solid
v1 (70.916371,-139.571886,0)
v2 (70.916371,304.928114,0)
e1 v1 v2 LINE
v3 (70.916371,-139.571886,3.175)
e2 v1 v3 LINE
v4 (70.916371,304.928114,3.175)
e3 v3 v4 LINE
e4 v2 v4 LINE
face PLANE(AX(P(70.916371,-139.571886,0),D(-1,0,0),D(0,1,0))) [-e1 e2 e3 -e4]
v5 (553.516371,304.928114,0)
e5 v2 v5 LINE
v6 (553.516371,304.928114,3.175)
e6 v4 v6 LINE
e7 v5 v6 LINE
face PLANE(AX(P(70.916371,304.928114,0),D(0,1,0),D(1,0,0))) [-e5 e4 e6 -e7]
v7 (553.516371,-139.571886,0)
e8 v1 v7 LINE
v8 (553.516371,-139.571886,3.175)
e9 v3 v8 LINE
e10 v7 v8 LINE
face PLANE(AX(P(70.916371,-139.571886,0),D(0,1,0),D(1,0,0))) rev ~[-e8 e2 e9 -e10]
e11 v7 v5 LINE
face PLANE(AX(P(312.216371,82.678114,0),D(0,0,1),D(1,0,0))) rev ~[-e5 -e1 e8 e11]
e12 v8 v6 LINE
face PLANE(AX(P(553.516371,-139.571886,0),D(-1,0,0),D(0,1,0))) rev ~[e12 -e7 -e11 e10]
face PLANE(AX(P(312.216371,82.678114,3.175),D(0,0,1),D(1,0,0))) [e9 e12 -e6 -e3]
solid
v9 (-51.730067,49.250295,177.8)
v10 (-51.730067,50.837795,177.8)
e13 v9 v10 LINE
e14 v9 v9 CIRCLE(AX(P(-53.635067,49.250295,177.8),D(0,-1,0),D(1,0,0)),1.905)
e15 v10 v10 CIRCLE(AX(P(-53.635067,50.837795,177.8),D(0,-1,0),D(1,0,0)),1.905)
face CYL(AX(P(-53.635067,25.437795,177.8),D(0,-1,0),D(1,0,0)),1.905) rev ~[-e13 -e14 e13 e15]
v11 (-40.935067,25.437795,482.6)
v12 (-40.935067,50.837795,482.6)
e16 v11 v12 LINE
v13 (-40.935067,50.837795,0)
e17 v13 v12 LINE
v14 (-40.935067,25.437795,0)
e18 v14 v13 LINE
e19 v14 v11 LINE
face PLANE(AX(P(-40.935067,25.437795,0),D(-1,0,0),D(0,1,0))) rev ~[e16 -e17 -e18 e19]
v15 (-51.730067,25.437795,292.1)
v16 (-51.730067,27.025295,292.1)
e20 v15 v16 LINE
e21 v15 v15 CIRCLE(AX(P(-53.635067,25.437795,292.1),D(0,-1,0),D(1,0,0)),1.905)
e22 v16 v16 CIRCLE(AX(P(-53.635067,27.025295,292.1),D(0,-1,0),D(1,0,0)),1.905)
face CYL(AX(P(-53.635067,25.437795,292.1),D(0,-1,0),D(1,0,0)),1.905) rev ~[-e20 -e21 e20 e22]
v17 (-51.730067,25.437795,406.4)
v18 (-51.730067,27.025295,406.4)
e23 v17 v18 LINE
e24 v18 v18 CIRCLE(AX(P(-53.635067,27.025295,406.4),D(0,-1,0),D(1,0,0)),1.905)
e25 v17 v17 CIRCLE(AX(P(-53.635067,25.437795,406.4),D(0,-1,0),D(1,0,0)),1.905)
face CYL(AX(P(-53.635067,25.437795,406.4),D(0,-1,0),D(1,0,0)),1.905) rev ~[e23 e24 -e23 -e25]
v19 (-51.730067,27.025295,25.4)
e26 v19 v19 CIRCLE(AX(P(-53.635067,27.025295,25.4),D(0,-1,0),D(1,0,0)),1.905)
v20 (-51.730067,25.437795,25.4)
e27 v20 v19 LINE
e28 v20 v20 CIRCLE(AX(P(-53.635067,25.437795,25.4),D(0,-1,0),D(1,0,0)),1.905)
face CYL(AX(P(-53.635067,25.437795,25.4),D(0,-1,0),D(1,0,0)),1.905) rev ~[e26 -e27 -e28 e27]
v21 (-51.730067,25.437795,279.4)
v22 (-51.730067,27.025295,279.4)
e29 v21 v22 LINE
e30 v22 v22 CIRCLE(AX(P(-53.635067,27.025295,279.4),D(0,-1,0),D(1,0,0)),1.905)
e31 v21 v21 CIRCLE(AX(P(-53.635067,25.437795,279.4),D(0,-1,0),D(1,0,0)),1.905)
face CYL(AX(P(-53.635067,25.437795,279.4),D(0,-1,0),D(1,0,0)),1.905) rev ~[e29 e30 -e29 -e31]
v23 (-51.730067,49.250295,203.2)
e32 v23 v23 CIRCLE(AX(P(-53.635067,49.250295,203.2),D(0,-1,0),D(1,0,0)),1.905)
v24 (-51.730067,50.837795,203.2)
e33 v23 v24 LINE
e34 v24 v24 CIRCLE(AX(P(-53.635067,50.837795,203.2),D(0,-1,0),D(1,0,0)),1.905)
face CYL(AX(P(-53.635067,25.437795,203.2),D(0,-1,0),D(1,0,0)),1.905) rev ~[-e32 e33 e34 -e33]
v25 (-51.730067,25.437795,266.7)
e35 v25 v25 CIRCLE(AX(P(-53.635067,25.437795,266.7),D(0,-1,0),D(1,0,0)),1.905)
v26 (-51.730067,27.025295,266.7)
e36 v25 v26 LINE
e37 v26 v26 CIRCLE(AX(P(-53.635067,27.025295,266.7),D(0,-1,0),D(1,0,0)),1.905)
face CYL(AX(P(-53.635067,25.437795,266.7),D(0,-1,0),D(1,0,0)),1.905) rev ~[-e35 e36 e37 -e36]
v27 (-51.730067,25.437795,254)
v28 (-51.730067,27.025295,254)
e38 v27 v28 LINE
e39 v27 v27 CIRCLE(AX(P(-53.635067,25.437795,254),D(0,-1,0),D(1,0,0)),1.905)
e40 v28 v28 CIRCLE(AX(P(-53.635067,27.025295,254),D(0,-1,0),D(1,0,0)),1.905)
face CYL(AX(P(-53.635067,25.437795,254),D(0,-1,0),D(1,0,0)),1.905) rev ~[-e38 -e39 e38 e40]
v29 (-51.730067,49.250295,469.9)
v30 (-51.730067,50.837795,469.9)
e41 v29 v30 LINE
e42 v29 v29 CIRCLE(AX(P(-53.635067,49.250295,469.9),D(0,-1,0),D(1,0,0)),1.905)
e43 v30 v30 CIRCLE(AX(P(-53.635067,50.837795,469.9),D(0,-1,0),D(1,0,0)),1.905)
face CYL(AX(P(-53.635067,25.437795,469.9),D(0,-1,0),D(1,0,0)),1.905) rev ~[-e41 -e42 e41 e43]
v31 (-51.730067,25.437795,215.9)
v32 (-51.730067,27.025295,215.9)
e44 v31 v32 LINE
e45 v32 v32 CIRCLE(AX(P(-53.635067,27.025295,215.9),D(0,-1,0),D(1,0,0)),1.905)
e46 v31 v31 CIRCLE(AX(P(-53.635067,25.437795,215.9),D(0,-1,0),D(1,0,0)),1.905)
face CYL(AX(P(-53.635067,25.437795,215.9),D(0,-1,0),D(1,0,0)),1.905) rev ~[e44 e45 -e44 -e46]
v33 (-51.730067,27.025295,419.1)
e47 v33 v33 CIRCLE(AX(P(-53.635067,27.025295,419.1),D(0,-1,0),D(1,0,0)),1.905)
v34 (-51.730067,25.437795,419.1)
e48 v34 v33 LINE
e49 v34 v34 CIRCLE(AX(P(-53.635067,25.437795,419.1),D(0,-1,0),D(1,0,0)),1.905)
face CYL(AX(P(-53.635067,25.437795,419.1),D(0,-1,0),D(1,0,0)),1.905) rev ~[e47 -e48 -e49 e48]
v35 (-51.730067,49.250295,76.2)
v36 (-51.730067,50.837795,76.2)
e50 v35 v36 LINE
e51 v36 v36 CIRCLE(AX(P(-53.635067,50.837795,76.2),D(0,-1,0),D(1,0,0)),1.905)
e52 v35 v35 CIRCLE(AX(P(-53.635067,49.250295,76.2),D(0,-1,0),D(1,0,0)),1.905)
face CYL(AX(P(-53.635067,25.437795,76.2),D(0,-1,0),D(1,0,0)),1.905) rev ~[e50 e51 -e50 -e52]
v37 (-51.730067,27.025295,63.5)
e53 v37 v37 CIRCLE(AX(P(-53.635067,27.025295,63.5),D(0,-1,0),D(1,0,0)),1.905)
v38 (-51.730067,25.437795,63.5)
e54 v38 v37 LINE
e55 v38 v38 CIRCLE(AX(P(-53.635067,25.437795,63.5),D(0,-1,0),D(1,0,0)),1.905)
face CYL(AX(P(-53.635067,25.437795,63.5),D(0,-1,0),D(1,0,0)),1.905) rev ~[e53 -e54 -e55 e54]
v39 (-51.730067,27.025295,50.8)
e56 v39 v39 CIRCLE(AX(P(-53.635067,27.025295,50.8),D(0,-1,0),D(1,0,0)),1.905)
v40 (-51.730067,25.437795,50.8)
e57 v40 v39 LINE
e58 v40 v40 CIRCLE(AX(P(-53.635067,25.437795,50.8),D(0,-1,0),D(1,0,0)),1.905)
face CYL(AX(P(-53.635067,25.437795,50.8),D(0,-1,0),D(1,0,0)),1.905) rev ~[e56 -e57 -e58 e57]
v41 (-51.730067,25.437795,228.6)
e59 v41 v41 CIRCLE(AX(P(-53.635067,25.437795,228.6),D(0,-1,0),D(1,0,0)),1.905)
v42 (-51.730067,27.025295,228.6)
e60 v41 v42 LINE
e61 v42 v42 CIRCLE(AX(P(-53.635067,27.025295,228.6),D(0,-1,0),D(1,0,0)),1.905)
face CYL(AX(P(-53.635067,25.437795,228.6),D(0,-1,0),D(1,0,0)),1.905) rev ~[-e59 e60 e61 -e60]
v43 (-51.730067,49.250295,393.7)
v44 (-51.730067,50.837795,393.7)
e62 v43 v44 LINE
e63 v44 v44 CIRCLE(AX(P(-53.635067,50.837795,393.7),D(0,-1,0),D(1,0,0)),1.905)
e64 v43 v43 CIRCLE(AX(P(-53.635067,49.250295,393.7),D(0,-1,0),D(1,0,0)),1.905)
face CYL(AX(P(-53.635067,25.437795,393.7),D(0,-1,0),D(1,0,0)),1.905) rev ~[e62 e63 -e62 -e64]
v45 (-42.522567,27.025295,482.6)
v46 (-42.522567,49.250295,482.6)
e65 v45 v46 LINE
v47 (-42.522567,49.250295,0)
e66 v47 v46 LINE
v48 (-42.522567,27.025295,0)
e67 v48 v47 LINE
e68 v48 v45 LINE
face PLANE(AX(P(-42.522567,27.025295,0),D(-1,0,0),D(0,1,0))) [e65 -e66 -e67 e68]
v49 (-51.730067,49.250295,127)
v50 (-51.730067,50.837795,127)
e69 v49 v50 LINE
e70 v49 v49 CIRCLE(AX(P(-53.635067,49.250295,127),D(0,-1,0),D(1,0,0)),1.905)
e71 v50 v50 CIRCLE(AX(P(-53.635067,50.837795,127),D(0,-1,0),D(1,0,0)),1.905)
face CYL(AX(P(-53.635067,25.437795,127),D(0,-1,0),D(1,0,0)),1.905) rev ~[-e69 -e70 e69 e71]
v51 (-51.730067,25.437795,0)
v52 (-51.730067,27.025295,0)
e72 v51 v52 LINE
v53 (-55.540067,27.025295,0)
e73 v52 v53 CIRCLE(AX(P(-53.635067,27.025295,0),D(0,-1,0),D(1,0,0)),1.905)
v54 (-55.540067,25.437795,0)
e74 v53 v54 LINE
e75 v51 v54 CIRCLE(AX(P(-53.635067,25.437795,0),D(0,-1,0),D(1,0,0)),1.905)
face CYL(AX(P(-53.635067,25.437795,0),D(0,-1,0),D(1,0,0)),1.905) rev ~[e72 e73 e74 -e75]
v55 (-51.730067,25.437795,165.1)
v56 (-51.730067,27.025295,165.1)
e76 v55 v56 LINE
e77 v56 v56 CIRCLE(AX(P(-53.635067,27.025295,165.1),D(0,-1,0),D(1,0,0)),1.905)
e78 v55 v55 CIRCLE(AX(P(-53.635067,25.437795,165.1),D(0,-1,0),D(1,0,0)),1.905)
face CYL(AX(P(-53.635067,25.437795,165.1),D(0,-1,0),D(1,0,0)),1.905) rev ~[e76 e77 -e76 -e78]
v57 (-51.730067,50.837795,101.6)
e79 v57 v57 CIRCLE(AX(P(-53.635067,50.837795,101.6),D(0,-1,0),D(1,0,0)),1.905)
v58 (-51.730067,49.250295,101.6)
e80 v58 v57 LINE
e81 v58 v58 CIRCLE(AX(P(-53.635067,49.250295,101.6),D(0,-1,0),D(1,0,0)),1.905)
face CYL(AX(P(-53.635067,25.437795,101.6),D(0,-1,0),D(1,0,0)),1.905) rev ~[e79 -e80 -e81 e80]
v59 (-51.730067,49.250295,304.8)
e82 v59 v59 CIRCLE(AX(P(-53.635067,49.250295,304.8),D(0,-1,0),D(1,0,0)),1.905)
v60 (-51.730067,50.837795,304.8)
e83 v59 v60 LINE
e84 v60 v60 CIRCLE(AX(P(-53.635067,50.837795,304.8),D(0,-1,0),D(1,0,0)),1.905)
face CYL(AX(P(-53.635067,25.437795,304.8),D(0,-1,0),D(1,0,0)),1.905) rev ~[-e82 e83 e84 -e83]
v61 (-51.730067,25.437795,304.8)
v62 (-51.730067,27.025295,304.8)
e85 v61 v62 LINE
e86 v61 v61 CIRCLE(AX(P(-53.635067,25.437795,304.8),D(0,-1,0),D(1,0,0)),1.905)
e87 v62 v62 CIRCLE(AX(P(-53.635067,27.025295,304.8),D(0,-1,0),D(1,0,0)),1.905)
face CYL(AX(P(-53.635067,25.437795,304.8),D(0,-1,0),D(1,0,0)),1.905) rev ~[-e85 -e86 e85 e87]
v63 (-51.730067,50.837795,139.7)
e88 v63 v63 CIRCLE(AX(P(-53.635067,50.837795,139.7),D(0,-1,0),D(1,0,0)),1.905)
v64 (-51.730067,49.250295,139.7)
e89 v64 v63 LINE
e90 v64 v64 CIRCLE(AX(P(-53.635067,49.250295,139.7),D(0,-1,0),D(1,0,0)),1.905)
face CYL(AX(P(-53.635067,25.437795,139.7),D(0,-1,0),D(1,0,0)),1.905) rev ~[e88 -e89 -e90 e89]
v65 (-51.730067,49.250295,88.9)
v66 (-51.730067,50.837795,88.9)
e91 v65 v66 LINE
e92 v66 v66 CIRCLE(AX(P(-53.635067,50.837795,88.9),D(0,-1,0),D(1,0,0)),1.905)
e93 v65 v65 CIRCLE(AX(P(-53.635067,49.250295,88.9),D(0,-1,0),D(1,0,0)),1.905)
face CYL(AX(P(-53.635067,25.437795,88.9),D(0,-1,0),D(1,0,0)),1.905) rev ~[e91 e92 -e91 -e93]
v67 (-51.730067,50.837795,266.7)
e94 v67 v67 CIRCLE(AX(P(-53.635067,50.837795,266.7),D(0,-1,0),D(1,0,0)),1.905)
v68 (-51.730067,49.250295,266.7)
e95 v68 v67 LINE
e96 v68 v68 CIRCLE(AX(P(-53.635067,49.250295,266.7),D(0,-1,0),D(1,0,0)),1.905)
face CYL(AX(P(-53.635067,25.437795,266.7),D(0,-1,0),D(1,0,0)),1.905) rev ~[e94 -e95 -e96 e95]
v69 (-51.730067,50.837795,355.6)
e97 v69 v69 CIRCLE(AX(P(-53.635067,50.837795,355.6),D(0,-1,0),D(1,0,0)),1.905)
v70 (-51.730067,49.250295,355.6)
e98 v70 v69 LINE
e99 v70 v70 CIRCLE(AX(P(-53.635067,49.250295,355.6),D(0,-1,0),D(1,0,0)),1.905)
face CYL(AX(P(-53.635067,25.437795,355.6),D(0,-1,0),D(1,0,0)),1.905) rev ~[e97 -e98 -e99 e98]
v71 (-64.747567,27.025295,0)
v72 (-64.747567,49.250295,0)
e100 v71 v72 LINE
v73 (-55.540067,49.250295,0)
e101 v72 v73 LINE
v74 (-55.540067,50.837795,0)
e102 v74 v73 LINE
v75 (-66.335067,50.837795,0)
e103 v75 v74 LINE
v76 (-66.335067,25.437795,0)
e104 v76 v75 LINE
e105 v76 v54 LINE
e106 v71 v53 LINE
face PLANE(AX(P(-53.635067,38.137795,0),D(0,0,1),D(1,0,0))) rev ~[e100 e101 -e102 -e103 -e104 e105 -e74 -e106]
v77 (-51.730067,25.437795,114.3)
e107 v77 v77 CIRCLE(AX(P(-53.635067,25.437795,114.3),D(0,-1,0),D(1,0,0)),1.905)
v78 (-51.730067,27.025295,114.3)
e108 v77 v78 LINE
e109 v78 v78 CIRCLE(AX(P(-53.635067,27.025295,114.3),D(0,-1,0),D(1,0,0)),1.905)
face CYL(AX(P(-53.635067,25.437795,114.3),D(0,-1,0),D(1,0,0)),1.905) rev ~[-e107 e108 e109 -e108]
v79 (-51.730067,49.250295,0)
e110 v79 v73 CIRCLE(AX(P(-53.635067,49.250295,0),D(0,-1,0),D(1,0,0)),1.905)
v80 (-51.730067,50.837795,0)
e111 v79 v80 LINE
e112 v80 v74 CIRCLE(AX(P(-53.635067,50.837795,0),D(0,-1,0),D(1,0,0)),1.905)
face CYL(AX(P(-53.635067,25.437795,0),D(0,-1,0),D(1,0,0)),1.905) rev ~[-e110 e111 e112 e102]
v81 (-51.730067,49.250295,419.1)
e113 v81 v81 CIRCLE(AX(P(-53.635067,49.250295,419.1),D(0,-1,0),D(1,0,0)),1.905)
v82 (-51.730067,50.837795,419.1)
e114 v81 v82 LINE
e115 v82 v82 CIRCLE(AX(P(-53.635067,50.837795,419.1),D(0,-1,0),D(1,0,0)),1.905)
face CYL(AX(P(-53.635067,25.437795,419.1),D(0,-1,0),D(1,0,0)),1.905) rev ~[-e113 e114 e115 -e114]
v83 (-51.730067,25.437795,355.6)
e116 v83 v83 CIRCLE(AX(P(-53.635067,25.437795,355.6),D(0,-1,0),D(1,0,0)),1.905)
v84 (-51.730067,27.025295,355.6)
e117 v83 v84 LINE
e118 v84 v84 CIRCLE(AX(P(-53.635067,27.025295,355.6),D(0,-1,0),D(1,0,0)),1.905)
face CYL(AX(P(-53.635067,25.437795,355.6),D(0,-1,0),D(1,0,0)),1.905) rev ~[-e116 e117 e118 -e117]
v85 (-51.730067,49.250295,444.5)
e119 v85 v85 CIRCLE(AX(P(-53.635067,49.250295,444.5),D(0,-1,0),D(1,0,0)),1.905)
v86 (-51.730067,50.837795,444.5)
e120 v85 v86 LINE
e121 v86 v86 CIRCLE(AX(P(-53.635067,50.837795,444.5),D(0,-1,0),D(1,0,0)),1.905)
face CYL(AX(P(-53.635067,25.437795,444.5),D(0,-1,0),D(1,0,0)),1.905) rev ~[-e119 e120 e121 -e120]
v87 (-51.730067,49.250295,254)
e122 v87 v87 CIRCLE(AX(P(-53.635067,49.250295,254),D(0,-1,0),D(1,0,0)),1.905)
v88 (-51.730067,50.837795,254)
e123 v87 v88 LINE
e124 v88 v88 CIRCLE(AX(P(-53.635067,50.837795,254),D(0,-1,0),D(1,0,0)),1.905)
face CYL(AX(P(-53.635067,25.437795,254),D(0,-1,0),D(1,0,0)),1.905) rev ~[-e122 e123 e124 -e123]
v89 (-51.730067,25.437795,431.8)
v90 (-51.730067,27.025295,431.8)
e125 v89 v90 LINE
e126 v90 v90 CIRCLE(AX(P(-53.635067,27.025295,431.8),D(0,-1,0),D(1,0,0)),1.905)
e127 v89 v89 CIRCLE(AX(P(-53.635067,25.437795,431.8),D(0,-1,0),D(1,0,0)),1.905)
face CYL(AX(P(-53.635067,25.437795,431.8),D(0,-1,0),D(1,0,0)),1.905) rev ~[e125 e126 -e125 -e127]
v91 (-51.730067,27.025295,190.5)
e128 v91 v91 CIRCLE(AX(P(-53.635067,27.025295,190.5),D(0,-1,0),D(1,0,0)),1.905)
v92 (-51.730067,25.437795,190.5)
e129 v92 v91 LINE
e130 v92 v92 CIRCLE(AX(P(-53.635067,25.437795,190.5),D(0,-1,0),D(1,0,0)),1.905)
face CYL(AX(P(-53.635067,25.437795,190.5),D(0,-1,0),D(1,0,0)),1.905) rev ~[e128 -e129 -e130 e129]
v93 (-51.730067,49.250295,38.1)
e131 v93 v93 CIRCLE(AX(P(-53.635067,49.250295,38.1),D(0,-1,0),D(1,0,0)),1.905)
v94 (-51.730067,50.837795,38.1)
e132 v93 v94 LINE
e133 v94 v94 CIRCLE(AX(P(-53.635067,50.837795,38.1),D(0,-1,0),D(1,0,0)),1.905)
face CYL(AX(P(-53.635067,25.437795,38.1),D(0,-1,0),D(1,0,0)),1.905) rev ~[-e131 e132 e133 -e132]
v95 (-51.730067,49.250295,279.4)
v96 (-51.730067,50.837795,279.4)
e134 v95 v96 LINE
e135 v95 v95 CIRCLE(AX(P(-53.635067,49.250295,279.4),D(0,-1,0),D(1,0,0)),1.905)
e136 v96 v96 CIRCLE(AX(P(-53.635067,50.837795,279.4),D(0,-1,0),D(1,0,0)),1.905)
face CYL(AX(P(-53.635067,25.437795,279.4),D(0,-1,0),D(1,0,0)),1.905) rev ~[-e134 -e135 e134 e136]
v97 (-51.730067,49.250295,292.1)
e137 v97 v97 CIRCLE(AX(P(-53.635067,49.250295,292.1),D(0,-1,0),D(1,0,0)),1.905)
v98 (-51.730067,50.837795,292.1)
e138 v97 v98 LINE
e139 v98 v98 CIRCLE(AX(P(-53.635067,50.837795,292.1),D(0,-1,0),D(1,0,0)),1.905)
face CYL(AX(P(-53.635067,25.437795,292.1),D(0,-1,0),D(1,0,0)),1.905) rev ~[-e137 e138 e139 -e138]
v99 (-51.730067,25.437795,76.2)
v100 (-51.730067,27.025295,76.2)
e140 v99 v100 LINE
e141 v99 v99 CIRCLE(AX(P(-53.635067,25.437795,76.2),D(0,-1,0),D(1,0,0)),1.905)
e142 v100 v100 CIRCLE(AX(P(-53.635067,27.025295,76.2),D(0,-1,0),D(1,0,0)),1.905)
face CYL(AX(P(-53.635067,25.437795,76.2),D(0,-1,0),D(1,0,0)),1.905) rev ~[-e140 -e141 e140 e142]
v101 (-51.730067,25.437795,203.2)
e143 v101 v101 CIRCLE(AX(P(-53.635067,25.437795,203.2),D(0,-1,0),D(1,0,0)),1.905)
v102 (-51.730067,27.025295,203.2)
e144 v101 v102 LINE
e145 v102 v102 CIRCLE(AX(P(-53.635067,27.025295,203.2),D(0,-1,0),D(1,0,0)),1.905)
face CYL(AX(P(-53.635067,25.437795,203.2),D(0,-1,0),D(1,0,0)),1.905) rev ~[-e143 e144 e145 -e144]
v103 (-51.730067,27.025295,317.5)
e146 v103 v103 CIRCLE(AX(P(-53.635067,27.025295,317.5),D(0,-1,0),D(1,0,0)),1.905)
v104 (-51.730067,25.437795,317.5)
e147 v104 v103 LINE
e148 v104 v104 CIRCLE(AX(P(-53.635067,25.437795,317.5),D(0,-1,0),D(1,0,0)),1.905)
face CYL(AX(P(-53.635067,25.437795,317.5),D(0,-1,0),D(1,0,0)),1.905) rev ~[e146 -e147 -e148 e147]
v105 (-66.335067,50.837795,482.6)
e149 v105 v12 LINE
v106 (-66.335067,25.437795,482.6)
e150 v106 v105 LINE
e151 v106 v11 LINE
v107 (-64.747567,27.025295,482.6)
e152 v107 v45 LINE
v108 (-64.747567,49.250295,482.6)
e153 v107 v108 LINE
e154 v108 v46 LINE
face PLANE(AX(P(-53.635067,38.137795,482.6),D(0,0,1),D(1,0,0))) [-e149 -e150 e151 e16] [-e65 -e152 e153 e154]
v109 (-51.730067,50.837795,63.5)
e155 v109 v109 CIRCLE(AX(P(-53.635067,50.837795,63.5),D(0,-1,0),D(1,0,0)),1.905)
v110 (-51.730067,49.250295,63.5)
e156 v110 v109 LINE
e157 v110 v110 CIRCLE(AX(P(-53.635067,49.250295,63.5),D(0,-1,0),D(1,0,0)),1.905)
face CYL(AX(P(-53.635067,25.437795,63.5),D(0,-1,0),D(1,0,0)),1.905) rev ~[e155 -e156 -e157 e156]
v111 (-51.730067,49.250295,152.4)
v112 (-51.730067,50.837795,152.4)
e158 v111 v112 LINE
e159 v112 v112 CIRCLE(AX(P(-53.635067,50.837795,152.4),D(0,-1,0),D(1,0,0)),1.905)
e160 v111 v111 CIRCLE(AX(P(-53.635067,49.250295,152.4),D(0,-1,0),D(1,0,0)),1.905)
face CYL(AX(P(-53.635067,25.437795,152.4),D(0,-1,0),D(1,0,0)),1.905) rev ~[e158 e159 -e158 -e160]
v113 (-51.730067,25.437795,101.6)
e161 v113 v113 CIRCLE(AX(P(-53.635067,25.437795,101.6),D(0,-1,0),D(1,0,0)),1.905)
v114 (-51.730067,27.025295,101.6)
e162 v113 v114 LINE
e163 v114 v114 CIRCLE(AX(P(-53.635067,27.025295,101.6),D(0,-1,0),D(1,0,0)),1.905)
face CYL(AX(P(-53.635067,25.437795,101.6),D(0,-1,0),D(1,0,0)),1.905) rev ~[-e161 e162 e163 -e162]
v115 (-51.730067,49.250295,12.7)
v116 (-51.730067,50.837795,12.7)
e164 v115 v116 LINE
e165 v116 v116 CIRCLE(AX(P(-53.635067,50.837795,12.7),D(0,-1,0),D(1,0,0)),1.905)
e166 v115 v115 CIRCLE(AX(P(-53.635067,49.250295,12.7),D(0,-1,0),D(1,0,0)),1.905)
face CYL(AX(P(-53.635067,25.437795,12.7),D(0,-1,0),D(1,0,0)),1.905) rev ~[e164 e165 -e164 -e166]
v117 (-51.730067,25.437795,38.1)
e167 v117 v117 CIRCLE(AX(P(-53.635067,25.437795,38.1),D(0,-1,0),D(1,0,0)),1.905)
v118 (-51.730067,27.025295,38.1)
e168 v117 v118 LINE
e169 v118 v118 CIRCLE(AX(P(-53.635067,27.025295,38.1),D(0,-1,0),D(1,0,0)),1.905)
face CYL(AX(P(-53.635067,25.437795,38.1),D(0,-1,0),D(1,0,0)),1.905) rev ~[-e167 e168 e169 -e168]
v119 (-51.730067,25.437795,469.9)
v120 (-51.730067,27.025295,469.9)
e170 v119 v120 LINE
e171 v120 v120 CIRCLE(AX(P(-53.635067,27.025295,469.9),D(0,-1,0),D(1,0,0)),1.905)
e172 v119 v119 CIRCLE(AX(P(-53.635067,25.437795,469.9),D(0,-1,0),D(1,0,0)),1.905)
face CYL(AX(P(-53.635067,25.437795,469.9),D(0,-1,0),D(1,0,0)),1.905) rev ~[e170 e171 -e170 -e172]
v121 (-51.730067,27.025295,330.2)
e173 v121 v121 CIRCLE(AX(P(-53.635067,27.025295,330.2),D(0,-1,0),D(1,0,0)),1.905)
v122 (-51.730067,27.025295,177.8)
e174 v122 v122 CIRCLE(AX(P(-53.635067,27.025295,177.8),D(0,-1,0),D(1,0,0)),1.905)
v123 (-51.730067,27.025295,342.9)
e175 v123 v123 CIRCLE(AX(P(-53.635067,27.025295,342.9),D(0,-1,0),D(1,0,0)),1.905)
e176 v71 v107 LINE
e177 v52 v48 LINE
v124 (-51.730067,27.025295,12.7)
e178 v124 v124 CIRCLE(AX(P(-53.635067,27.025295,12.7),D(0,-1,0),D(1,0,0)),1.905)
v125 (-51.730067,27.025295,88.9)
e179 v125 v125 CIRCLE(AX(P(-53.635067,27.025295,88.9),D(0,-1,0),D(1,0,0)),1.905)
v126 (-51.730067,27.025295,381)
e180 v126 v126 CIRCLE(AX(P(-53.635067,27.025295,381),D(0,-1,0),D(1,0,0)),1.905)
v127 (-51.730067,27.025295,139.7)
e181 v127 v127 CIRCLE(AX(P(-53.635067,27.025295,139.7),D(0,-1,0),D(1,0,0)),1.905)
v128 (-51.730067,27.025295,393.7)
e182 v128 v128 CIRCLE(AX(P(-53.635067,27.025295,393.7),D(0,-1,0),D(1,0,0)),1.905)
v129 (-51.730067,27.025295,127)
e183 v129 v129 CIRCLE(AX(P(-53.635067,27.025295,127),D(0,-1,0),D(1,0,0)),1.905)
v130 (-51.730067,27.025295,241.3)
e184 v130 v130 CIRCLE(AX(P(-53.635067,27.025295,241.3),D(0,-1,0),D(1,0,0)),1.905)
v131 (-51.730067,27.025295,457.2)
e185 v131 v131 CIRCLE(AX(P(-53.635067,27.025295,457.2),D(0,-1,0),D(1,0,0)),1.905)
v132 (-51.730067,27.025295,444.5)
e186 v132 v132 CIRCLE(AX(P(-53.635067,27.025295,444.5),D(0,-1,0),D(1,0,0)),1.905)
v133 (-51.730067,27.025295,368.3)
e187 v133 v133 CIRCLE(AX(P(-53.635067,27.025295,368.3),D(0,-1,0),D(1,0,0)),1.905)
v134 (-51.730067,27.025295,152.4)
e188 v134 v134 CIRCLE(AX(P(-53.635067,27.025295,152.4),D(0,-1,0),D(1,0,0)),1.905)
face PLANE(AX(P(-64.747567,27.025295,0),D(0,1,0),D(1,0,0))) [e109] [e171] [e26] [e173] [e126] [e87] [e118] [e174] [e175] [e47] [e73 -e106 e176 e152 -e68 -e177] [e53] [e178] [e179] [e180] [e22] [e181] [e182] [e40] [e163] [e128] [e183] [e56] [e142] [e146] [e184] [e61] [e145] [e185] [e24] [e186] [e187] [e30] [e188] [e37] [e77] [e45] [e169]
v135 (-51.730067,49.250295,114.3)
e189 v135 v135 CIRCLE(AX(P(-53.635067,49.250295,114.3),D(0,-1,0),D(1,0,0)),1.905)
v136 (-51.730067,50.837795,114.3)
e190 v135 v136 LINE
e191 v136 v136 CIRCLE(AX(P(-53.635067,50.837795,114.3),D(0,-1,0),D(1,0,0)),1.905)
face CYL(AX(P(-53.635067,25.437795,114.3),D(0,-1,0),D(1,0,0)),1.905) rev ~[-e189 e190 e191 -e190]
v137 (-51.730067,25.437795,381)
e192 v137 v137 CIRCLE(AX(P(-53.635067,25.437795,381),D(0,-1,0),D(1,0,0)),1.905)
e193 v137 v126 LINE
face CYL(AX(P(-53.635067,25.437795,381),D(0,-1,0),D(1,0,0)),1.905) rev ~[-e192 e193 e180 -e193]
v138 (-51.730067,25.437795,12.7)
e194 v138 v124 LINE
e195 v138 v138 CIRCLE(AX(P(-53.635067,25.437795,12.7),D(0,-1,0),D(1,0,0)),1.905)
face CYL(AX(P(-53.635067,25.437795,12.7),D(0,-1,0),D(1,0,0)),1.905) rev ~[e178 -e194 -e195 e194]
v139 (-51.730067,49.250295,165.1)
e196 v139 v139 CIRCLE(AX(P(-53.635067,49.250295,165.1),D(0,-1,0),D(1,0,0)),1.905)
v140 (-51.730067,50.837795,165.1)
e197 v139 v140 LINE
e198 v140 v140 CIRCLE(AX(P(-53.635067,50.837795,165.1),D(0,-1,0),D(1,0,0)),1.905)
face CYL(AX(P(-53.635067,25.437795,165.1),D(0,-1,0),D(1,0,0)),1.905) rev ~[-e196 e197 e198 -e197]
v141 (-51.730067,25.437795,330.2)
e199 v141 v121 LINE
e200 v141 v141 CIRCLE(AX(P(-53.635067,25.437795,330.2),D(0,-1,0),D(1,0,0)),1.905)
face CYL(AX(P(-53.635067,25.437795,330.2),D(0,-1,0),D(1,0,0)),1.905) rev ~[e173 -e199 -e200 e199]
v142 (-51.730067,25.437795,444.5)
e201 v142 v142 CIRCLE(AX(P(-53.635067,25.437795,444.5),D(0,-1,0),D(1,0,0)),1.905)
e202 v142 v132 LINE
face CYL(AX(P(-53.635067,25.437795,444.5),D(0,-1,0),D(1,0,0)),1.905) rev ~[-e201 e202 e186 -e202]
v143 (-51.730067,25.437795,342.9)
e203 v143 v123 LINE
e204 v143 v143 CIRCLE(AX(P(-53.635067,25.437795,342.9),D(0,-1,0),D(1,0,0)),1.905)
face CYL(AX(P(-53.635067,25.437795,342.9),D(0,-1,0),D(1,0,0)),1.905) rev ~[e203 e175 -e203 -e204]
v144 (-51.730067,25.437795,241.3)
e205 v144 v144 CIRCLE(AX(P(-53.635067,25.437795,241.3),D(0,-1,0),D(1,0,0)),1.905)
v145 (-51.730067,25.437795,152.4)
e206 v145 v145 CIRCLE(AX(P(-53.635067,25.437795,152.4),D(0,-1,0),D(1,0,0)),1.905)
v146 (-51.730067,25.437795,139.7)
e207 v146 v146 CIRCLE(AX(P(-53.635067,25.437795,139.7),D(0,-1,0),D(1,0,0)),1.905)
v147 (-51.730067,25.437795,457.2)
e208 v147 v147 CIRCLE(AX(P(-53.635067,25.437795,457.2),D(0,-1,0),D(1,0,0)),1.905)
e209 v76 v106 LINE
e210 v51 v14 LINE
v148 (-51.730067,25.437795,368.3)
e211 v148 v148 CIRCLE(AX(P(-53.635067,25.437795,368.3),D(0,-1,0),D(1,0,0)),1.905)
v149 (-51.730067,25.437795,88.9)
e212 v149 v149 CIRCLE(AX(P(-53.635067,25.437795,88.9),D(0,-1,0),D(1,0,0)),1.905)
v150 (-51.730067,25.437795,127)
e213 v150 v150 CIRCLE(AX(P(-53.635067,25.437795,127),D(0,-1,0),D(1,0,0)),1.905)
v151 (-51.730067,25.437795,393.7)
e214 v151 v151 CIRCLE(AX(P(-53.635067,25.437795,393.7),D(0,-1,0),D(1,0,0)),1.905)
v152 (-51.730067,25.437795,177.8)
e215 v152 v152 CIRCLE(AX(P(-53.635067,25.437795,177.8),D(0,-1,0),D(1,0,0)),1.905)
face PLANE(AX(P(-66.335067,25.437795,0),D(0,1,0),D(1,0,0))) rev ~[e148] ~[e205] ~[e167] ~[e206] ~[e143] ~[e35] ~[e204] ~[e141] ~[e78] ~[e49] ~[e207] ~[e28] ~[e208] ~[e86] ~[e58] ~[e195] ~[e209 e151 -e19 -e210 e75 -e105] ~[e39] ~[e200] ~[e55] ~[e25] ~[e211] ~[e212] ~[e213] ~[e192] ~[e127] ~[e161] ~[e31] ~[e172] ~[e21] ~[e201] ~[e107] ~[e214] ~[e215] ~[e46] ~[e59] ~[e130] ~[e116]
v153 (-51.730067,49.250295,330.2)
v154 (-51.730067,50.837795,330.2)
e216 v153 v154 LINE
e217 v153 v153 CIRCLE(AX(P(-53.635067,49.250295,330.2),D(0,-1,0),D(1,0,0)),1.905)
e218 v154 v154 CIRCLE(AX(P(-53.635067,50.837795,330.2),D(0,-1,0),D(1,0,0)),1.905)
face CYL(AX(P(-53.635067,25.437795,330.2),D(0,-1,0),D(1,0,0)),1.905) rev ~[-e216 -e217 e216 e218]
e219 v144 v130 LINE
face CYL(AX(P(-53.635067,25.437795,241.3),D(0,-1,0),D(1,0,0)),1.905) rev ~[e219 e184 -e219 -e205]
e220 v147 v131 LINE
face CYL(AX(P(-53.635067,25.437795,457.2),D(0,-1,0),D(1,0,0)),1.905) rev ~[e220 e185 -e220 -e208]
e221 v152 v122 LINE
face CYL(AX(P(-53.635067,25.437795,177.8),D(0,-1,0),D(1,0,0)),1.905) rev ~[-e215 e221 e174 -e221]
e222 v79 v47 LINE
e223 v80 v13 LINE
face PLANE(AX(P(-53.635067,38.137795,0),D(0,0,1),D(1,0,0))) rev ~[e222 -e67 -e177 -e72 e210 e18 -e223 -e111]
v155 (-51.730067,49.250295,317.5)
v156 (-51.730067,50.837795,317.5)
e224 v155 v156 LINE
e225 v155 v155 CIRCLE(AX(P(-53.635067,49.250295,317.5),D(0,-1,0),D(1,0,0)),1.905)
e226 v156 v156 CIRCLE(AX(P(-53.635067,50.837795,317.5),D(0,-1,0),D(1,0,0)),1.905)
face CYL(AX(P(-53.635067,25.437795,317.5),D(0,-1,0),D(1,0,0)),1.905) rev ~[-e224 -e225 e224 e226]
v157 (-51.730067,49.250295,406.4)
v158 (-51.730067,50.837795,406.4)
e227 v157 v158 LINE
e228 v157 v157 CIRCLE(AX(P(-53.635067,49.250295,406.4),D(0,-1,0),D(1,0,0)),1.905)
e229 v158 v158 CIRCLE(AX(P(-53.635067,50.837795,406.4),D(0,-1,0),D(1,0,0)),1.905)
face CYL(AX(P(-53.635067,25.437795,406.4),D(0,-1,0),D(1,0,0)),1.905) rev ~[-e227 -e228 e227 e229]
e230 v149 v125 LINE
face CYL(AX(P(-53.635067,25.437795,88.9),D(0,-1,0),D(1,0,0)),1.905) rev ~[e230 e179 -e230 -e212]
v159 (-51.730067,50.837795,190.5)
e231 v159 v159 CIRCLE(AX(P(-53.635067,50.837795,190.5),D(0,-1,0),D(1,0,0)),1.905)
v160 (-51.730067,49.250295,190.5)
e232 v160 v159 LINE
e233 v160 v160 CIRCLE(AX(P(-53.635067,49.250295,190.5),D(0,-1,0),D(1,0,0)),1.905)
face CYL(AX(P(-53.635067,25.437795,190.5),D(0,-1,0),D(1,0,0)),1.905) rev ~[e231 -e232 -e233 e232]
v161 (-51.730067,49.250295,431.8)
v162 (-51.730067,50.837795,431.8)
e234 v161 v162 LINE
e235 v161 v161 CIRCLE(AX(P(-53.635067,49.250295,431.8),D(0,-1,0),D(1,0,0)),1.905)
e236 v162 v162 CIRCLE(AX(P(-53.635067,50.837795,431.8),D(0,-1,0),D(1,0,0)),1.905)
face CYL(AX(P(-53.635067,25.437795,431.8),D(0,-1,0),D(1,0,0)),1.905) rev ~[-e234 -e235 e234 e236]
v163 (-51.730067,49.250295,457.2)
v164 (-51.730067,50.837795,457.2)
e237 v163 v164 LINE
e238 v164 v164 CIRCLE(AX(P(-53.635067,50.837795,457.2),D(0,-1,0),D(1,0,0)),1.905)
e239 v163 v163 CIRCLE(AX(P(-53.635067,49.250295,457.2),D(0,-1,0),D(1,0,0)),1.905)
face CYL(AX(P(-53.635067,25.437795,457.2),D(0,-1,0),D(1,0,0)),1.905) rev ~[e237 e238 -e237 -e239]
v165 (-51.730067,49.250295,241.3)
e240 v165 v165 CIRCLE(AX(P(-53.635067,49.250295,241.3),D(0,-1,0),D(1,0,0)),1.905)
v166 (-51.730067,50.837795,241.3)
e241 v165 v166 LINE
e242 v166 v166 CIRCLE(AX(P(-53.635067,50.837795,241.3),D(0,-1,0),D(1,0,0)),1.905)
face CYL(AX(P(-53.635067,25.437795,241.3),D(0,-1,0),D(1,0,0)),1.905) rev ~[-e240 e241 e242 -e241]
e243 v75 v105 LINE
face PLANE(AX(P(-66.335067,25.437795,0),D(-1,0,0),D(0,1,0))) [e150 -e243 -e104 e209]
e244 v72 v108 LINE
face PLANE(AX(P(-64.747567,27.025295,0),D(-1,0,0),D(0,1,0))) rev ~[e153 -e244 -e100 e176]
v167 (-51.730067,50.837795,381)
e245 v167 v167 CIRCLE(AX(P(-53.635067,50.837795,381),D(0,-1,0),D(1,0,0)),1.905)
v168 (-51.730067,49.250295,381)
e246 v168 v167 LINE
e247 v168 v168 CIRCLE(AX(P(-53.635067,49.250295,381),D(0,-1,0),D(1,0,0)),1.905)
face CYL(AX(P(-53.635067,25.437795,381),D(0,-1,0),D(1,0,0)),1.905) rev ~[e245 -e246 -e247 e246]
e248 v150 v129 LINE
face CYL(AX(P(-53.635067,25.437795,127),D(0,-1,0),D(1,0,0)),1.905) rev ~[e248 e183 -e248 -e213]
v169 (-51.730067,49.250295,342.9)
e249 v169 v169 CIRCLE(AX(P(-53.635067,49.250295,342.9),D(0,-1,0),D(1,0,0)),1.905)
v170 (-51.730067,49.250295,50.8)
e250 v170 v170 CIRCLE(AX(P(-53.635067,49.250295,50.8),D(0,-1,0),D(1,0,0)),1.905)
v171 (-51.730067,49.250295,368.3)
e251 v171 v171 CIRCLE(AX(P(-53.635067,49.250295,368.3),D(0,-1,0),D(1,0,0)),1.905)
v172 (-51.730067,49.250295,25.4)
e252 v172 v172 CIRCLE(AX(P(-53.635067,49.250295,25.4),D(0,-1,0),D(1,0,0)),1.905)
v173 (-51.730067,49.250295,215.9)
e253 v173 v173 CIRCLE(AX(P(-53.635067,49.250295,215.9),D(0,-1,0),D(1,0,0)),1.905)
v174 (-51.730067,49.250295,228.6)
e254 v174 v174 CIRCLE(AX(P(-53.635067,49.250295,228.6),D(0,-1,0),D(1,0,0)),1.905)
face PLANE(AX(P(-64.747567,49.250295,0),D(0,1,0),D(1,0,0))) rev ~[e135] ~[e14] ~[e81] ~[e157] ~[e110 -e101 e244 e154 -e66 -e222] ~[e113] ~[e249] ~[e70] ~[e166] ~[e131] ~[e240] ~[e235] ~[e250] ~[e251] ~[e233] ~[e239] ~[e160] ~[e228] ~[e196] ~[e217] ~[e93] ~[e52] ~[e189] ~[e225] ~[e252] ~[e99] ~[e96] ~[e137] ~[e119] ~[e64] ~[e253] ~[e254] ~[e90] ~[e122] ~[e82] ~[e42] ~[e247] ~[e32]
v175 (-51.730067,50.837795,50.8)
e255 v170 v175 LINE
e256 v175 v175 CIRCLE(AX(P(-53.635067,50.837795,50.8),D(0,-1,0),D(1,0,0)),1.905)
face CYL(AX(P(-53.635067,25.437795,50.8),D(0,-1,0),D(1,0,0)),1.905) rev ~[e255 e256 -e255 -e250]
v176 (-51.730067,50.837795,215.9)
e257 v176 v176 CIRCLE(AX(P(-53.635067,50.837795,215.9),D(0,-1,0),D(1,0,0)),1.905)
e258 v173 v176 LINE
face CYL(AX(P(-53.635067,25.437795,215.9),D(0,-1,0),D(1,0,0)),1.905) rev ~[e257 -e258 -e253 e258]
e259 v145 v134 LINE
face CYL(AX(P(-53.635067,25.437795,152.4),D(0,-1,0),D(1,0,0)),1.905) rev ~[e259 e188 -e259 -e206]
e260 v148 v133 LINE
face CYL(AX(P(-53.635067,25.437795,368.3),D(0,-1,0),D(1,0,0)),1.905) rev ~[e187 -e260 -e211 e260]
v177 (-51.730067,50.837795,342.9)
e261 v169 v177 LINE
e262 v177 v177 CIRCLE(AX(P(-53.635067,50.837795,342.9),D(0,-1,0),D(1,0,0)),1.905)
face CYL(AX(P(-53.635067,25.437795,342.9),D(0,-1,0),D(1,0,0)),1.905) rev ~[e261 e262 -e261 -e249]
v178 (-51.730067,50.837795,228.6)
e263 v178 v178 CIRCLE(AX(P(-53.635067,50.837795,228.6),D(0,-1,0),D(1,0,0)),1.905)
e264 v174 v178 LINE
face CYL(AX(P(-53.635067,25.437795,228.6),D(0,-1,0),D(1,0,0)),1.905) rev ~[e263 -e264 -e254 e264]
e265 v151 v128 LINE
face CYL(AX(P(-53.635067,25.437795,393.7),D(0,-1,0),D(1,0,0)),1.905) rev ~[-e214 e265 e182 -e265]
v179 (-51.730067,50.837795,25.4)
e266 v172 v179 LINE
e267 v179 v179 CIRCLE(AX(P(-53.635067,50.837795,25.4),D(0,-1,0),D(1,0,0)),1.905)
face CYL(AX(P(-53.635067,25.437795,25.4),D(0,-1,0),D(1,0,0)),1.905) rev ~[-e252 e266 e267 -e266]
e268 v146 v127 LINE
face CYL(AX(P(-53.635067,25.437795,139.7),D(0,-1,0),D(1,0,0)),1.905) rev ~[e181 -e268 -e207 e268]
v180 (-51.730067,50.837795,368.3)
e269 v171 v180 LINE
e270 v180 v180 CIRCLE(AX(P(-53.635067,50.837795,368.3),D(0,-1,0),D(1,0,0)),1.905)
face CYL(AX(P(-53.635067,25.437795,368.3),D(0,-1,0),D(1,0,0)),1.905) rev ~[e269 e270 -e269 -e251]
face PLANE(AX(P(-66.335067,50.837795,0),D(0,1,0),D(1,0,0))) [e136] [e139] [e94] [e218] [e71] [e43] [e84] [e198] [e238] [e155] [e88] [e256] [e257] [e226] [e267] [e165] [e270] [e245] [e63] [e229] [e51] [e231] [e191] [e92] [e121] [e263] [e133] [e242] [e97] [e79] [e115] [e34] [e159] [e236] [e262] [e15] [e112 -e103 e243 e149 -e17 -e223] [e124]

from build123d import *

# Parameters (mm, degrees)
F0_W     = 25.4
F0_H     = 25.4
F0_W_2   = 22.225
F0_H_2   = 22.225
F1_DEPTH = 482.6
F2_R     = 1.905
F3_DEPTH = 25.401
F4_W     = 482.6
F4_H     = 444.5
F5_DEPTH = 3.175


# Not quite as in the source:
# - a length typed as a fraction of an inch, garbled in the dataset ("3 / 203.2 mm" for 3/8 in), is restored


with BuildPart() as f1:
    # F0 (on Top) → F1 (new body)
    with BuildSketch(Plane.XY):
        with Locations((-53.6350669761, 38.1377951519)):
            Rectangle(F0_W, F0_H)
        with Locations((-53.6350669761, 38.1377951519)):
            Rectangle(F0_W_2, F0_H_2, mode=Mode.SUBTRACT)
    extrude(amount=F1_DEPTH)

    # F2 (on face) → F3 (cut, through all)
    with BuildSketch(Plane.XZ.offset(-25.4377951519)):
        with Locations((-53.6350669761, 469.9)):
            Circle(F2_R)
        with Locations((-53.6350669761, 457.2)):
            Circle(F2_R)
        with Locations((-53.6350669761, 444.5)):
            Circle(F2_R)
        with Locations((-53.6350669761, 431.8)):
            Circle(F2_R)
        with Locations((-53.6350669761, 419.1)):
            Circle(F2_R)
        with Locations((-53.6350669761, 406.4)):
            Circle(F2_R)
        with Locations((-53.6350669761, 393.7)):
            Circle(F2_R)
        with Locations((-53.6350669761, 381)):
            Circle(F2_R)
        with Locations((-53.6350669761, 368.3)):
            Circle(F2_R)
        with Locations((-53.6350669761, 355.6)):
            Circle(F2_R)
        with Locations((-53.6350669761, 342.9)):
            Circle(F2_R)
        with Locations((-53.6350669761, 330.2)):
            Circle(F2_R)
        with Locations((-53.6350669761, 317.5)):
            Circle(F2_R)
        with Locations((-53.6350669761, 304.8)):
            Circle(F2_R)
        with Locations((-53.6350669761, 292.1)):
            Circle(F2_R)
        with Locations((-53.6350669761, 279.4)):
            Circle(F2_R)
        with Locations((-53.6350669761, 266.7)):
            Circle(F2_R)
        with Locations((-53.6350669761, 254)):
            Circle(F2_R)
        with Locations((-53.6350669761, 241.3)):
            Circle(F2_R)
        with Locations((-53.6350669761, 228.6)):
            Circle(F2_R)
        with Locations((-53.6350669761, 215.9)):
            Circle(F2_R)
        with Locations((-53.6350669761, 203.2)):
            Circle(F2_R)
        with Locations((-53.6350669761, 190.5)):
            Circle(F2_R)
        with Locations((-53.6350669761, 177.8)):
            Circle(F2_R)
        with Locations((-53.6350669761, 165.1)):
            Circle(F2_R)
        with Locations((-53.6350669761, 152.4)):
            Circle(F2_R)
        with Locations((-53.6350669761, 139.7)):
            Circle(F2_R)
        with Locations((-53.6350669761, 127)):
            Circle(F2_R)
        with Locations((-53.6350669761, 114.3)):
            Circle(F2_R)
        with Locations((-53.6350669761, 101.6)):
            Circle(F2_R)
        with Locations((-53.6350669761, 88.9)):
            Circle(F2_R)
        with Locations((-53.6350669761, 76.2)):
            Circle(F2_R)
        with Locations((-53.6350669761, 63.5)):
            Circle(F2_R)
        with Locations((-53.6350669761, 50.8)):
            Circle(F2_R)
        with Locations((-53.6350669761, 38.1)):
            Circle(F2_R)
        with Locations((-53.6350669761, 25.4)):
            Circle(F2_R)
        with Locations((-53.6350669761, 12.7)):
            Circle(F2_R)
        with Locations((-53.6350669761, 0)):
            Circle(F2_R)
        with Locations((-53.6350669761, -12.7)):
            Circle(F2_R)
        with Locations((-53.6350669761, -25.4)):
            Circle(F2_R)
    extrude(amount=-F3_DEPTH, mode=Mode.SUBTRACT)


with BuildPart() as f5:
    # F4 (on Top) → F5 (new body)
    with BuildSketch(Plane.XY):
        with Locations((312.2163708924, 82.6781136751)):
            Rectangle(F4_W, F4_H)
    extrude(amount=F5_DEPTH)


solid = Compound([f1.part, f5.part])
